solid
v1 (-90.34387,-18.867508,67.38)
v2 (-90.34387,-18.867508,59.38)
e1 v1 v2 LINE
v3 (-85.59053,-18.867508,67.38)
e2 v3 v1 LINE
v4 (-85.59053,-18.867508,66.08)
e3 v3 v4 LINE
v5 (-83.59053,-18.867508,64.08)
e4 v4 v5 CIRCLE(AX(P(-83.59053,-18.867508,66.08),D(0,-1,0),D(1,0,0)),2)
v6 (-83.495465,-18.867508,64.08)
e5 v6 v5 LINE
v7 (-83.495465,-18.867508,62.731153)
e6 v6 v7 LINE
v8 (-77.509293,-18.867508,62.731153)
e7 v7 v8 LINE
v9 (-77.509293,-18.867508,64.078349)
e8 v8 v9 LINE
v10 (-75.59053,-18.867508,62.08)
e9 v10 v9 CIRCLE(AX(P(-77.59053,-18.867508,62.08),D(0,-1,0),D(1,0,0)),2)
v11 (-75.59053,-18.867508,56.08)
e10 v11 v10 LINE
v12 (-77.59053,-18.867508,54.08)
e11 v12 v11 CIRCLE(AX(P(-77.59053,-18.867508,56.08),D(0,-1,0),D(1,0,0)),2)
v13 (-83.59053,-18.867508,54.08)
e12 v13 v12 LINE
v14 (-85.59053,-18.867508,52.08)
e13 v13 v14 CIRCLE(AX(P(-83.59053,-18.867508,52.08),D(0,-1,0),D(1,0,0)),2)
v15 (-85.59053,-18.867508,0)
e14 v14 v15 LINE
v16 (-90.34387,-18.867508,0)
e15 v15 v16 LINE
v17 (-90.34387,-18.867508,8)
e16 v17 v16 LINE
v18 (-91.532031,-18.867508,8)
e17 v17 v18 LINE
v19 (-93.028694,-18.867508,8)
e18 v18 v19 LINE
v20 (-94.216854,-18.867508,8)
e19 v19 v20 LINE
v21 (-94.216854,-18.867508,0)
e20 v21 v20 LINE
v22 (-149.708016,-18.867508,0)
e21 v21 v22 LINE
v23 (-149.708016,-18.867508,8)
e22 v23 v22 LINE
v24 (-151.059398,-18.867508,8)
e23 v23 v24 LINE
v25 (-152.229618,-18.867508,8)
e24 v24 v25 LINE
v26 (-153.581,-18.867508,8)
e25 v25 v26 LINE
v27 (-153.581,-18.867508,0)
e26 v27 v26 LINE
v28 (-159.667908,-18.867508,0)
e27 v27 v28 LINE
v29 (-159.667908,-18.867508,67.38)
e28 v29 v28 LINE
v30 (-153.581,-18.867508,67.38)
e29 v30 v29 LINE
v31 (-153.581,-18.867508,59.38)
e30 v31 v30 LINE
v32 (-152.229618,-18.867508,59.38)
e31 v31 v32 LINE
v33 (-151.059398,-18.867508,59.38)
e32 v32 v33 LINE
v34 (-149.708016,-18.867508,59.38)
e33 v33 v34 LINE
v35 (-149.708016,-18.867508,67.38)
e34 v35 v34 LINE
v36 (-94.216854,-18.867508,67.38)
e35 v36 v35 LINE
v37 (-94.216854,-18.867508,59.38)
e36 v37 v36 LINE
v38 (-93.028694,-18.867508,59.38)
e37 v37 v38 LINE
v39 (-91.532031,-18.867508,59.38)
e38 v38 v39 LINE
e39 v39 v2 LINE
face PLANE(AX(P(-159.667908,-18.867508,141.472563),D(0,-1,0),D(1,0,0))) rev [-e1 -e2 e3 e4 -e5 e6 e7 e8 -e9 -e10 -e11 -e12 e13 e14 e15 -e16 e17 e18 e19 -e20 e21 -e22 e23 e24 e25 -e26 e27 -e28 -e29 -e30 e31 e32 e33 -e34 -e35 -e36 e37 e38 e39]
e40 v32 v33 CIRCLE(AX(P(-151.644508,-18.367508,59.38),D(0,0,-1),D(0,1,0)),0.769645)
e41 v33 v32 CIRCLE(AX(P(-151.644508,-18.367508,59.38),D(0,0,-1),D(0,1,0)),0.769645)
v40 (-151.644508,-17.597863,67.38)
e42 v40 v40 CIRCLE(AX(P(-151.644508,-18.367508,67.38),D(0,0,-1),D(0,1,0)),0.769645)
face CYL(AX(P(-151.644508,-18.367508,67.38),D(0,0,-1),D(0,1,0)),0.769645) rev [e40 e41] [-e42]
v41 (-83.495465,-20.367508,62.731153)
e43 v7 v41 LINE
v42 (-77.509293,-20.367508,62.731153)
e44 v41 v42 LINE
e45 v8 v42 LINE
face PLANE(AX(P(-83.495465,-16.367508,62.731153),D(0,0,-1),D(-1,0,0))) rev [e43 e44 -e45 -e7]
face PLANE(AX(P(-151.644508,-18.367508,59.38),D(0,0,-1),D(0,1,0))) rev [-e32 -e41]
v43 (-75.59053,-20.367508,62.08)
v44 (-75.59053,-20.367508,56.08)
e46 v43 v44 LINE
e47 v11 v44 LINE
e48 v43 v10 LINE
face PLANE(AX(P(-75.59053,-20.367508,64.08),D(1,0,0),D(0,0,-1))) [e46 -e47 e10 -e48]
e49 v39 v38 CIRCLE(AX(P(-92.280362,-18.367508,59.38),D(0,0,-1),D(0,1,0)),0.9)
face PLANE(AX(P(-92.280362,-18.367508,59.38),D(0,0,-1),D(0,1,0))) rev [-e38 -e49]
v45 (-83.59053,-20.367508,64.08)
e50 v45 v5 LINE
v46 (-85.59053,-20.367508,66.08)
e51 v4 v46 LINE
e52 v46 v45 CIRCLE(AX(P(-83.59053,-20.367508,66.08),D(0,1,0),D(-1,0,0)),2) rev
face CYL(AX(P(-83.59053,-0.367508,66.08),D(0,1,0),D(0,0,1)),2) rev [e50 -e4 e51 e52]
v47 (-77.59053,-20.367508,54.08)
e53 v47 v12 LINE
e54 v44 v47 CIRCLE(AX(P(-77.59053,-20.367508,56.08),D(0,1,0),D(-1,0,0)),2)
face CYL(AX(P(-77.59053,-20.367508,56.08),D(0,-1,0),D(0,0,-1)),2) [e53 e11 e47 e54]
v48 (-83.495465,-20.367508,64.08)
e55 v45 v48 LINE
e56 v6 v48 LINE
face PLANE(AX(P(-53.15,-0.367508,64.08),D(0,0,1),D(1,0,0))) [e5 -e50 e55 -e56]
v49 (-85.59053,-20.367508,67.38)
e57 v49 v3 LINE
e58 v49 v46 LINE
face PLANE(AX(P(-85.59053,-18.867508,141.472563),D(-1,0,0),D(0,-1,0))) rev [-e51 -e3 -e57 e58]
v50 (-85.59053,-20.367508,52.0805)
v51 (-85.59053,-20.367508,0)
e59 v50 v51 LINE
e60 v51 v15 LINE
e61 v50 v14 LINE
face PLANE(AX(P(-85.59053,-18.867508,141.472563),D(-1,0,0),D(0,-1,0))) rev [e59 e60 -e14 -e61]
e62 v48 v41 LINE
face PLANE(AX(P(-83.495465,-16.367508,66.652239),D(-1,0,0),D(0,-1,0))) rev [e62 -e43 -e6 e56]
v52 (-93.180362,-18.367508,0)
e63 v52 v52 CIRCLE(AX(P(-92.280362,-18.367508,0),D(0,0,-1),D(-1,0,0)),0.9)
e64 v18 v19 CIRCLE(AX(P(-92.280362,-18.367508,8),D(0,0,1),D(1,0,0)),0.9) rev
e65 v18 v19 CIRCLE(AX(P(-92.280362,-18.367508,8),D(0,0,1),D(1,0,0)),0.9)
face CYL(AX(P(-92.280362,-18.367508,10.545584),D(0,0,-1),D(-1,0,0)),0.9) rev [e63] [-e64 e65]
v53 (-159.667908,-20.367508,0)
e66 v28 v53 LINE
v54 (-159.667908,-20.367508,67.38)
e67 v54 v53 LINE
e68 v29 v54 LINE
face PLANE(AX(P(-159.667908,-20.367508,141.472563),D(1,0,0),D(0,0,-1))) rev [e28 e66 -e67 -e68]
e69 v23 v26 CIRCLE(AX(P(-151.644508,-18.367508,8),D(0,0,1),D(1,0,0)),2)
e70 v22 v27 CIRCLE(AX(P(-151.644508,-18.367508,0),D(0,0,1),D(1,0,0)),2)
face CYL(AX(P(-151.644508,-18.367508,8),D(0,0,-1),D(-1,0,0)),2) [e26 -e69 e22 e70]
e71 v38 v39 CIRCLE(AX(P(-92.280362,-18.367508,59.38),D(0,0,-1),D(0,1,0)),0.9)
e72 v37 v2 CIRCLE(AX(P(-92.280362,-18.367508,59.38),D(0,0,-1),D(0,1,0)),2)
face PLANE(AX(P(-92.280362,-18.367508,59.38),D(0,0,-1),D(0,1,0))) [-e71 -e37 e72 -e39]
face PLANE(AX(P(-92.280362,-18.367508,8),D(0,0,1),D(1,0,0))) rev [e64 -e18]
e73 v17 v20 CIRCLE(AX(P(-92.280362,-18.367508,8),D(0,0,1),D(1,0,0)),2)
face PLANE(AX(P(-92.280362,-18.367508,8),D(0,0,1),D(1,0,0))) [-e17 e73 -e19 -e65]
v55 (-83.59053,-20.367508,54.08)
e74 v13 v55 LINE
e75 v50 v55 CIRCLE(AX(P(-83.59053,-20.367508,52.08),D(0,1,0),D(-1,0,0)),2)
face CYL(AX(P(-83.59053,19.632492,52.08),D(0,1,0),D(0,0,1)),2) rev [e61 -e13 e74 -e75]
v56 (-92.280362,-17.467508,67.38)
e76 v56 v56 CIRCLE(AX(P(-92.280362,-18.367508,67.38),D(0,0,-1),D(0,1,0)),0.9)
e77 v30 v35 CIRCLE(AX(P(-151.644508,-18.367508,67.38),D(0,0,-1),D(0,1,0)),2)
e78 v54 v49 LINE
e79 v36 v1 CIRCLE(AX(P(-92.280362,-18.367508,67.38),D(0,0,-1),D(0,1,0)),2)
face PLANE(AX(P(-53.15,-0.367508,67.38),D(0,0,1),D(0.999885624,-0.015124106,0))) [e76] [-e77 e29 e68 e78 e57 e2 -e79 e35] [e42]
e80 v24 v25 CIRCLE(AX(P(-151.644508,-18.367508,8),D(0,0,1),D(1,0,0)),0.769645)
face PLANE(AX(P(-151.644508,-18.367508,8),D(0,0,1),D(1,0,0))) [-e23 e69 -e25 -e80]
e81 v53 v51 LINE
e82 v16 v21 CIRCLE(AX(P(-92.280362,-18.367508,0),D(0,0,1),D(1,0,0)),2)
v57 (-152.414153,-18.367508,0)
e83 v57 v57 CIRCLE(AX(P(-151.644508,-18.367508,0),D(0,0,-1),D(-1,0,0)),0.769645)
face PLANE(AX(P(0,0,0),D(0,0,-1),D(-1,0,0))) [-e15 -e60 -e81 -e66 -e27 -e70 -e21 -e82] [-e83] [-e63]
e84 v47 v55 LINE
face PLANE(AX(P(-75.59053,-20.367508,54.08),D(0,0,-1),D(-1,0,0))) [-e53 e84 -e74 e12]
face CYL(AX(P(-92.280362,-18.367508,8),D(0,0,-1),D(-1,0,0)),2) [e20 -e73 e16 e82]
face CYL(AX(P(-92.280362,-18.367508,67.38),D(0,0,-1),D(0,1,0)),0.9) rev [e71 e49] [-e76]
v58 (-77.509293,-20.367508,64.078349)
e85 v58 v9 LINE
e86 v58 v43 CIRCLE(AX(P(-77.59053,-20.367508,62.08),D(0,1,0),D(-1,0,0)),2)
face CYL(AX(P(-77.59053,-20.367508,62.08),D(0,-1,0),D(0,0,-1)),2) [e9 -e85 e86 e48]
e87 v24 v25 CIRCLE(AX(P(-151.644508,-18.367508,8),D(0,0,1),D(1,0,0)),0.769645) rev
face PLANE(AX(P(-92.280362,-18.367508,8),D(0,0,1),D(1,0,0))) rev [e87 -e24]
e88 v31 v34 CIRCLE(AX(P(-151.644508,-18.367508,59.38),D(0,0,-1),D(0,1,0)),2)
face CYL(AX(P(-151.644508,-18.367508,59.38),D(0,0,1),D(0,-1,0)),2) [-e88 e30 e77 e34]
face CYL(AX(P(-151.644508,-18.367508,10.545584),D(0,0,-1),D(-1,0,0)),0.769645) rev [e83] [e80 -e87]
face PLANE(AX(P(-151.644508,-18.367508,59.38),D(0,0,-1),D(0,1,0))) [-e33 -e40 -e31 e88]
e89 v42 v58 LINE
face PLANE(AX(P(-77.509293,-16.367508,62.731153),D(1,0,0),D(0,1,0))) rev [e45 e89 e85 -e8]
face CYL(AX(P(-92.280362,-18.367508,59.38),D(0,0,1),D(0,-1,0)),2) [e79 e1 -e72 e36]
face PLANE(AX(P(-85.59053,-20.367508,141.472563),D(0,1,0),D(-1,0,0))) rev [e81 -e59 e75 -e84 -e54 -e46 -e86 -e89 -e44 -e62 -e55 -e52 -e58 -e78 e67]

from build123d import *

# Parameters (mm, degrees)
SKETCH1_W             = 74.077377751
SKETCH1_H             = 1.5
BOSS_EXTRUDE1_DEPTH   = 67.38
SKETCH2_R             = 2
BOSS_EXTRUDE2_DEPTH   = 8
SKETCH3_R             = 0.769644957
SKETCH3_R_2           = 0.9
CUT_EXTRUDE1_DEPTH    = 8
BOSS_EXTRUDE3_START   = 8
SKETCH4_R             = 2
BOSS_EXTRUDE3_DEPTH   = 8
SKETCH5_R             = 0.9
SKETCH5_R_2           = 0.769644957
CUT_EXTRUDE2_DEPTH    = 8
BOSS_EXTRUDE4_START   = -20.367507575
BOSS_EXTRUDE4_DEPTH   = 1.5
BOSS_EXTRUDE4_START_2 = 64.08
BOSS_EXTRUDE4_2_DEPTH = 1.5
SKETCH7_W             = 5.986172604
SKETCH7_H             = 3.921086245
CUT_EXTRUDE4_DEPTH    = 174.349085042


with BuildPart() as part:
    # Sketch1 → Boss-Extrude1 (new body)
    with BuildSketch(Plane.XY):
        with Locations((-122.62921925, -19.617507575)):
            Rectangle(SKETCH1_W, SKETCH1_H)
    extrude(amount=BOSS_EXTRUDE1_DEPTH)

    # Sketch2 → Boss-Extrude2 (add)
    with BuildSketch(Plane.XY):
        with Locations((-151.644507933, -18.367507575)):
            Circle(SKETCH2_R)
        with Locations((-92.280362099, -18.367507575)):
            Circle(SKETCH2_R)
    extrude(amount=BOSS_EXTRUDE2_DEPTH)

    # Sketch3 → Cut-Extrude1 (cut)
    with BuildSketch(Plane(origin=(0, 0, 0), x_dir=(-1, 0, 0), z_dir=(0, 0, -1))):
        with Locations((151.644507933, -18.367507575)):
            Circle(SKETCH3_R)
        with Locations((92.280362099, -18.367507575)):
            Circle(SKETCH3_R_2)
    extrude(amount=-CUT_EXTRUDE1_DEPTH, mode=Mode.SUBTRACT)

    # Sketch4 → Boss-Extrude3 (add)
    with BuildSketch(Plane(origin=(0, 0, 67.38), x_dir=(-1, 0, 0), z_dir=(0, 0, -1)).offset(BOSS_EXTRUDE3_START)):
        with Locations((151.644507933, -18.367507575)):
            Circle(SKETCH4_R)
        with Locations((92.280362099, -18.367507575)):
            Circle(SKETCH4_R)
    extrude(amount=-BOSS_EXTRUDE3_DEPTH)

    # Sketch5 → Cut-Extrude2 (cut)
    with BuildSketch(Plane(origin=(0, 0, 59.38), x_dir=(-1, 0, 0), z_dir=(0, 0, -1))):
        with Locations((92.280362099, -18.367507575)):
            Circle(SKETCH5_R)
        with Locations((151.644507933, -18.367507575)):
            Circle(SKETCH5_R_2)
    extrude(amount=-CUT_EXTRUDE2_DEPTH, mode=Mode.SUBTRACT)

    # Boss-Extrude4: read off the stored shape, not the designer's step
    # Boss-Extrude4 outline → Boss-Extrude4 (add)
    with BuildSketch(Plane(origin=(0, 0, 0), x_dir=(1, 0, 0), z_dir=(0, 1, 0)).offset(BOSS_EXTRUDE4_START)):
        with BuildLine():
            ThreePointArc((-85.590530374, -66.08), (-85.004743937, -64.665786437), (-83.590530374, -64.08))
            Line((-83.590530374, -64.08), (-77.590530374, -64.08))
            ThreePointArc((-77.590530374, -64.08), (-76.176316812, -63.494213562), (-75.590530374, -62.08))
            Line((-75.590530374, -62.08), (-75.590530374, -56.08))
            ThreePointArc((-75.590530374, -56.08), (-76.176316812, -54.665786438), (-77.590530374, -54.08))
            Line((-77.590530374, -54.08), (-83.590530374, -54.08))
            ThreePointArc((-83.590530374, -54.08), (-85.004743937, -53.494213563), (-85.590530374, -52.08))
            Line((-85.590530374, -52.08), (-85.590530374, -66.08))
        make_face()
    extrude(amount=BOSS_EXTRUDE4_DEPTH)

    # Boss-Extrude4 2 outline → Boss-Extrude4 2 (add)
    with BuildSketch(Plane.XY.offset(BOSS_EXTRUDE4_START_2)):
        Polygon((-79.170711658, -18.867507575), (-82.010469997, -18.867507575), (-80.595461682, -19.68726796), align=None)
    extrude(amount=BOSS_EXTRUDE4_2_DEPTH)

    # Sketch7 → Cut-Extrude4 (cut, through all)
    with BuildSketch(Plane.XZ.offset(20.367507575)):
        with Locations((-80.502378911, 64.691696103)):
            Rectangle(SKETCH7_W, SKETCH7_H)
    extrude(amount=-CUT_EXTRUDE4_DEPTH, mode=Mode.SUBTRACT)


solid = part.part
